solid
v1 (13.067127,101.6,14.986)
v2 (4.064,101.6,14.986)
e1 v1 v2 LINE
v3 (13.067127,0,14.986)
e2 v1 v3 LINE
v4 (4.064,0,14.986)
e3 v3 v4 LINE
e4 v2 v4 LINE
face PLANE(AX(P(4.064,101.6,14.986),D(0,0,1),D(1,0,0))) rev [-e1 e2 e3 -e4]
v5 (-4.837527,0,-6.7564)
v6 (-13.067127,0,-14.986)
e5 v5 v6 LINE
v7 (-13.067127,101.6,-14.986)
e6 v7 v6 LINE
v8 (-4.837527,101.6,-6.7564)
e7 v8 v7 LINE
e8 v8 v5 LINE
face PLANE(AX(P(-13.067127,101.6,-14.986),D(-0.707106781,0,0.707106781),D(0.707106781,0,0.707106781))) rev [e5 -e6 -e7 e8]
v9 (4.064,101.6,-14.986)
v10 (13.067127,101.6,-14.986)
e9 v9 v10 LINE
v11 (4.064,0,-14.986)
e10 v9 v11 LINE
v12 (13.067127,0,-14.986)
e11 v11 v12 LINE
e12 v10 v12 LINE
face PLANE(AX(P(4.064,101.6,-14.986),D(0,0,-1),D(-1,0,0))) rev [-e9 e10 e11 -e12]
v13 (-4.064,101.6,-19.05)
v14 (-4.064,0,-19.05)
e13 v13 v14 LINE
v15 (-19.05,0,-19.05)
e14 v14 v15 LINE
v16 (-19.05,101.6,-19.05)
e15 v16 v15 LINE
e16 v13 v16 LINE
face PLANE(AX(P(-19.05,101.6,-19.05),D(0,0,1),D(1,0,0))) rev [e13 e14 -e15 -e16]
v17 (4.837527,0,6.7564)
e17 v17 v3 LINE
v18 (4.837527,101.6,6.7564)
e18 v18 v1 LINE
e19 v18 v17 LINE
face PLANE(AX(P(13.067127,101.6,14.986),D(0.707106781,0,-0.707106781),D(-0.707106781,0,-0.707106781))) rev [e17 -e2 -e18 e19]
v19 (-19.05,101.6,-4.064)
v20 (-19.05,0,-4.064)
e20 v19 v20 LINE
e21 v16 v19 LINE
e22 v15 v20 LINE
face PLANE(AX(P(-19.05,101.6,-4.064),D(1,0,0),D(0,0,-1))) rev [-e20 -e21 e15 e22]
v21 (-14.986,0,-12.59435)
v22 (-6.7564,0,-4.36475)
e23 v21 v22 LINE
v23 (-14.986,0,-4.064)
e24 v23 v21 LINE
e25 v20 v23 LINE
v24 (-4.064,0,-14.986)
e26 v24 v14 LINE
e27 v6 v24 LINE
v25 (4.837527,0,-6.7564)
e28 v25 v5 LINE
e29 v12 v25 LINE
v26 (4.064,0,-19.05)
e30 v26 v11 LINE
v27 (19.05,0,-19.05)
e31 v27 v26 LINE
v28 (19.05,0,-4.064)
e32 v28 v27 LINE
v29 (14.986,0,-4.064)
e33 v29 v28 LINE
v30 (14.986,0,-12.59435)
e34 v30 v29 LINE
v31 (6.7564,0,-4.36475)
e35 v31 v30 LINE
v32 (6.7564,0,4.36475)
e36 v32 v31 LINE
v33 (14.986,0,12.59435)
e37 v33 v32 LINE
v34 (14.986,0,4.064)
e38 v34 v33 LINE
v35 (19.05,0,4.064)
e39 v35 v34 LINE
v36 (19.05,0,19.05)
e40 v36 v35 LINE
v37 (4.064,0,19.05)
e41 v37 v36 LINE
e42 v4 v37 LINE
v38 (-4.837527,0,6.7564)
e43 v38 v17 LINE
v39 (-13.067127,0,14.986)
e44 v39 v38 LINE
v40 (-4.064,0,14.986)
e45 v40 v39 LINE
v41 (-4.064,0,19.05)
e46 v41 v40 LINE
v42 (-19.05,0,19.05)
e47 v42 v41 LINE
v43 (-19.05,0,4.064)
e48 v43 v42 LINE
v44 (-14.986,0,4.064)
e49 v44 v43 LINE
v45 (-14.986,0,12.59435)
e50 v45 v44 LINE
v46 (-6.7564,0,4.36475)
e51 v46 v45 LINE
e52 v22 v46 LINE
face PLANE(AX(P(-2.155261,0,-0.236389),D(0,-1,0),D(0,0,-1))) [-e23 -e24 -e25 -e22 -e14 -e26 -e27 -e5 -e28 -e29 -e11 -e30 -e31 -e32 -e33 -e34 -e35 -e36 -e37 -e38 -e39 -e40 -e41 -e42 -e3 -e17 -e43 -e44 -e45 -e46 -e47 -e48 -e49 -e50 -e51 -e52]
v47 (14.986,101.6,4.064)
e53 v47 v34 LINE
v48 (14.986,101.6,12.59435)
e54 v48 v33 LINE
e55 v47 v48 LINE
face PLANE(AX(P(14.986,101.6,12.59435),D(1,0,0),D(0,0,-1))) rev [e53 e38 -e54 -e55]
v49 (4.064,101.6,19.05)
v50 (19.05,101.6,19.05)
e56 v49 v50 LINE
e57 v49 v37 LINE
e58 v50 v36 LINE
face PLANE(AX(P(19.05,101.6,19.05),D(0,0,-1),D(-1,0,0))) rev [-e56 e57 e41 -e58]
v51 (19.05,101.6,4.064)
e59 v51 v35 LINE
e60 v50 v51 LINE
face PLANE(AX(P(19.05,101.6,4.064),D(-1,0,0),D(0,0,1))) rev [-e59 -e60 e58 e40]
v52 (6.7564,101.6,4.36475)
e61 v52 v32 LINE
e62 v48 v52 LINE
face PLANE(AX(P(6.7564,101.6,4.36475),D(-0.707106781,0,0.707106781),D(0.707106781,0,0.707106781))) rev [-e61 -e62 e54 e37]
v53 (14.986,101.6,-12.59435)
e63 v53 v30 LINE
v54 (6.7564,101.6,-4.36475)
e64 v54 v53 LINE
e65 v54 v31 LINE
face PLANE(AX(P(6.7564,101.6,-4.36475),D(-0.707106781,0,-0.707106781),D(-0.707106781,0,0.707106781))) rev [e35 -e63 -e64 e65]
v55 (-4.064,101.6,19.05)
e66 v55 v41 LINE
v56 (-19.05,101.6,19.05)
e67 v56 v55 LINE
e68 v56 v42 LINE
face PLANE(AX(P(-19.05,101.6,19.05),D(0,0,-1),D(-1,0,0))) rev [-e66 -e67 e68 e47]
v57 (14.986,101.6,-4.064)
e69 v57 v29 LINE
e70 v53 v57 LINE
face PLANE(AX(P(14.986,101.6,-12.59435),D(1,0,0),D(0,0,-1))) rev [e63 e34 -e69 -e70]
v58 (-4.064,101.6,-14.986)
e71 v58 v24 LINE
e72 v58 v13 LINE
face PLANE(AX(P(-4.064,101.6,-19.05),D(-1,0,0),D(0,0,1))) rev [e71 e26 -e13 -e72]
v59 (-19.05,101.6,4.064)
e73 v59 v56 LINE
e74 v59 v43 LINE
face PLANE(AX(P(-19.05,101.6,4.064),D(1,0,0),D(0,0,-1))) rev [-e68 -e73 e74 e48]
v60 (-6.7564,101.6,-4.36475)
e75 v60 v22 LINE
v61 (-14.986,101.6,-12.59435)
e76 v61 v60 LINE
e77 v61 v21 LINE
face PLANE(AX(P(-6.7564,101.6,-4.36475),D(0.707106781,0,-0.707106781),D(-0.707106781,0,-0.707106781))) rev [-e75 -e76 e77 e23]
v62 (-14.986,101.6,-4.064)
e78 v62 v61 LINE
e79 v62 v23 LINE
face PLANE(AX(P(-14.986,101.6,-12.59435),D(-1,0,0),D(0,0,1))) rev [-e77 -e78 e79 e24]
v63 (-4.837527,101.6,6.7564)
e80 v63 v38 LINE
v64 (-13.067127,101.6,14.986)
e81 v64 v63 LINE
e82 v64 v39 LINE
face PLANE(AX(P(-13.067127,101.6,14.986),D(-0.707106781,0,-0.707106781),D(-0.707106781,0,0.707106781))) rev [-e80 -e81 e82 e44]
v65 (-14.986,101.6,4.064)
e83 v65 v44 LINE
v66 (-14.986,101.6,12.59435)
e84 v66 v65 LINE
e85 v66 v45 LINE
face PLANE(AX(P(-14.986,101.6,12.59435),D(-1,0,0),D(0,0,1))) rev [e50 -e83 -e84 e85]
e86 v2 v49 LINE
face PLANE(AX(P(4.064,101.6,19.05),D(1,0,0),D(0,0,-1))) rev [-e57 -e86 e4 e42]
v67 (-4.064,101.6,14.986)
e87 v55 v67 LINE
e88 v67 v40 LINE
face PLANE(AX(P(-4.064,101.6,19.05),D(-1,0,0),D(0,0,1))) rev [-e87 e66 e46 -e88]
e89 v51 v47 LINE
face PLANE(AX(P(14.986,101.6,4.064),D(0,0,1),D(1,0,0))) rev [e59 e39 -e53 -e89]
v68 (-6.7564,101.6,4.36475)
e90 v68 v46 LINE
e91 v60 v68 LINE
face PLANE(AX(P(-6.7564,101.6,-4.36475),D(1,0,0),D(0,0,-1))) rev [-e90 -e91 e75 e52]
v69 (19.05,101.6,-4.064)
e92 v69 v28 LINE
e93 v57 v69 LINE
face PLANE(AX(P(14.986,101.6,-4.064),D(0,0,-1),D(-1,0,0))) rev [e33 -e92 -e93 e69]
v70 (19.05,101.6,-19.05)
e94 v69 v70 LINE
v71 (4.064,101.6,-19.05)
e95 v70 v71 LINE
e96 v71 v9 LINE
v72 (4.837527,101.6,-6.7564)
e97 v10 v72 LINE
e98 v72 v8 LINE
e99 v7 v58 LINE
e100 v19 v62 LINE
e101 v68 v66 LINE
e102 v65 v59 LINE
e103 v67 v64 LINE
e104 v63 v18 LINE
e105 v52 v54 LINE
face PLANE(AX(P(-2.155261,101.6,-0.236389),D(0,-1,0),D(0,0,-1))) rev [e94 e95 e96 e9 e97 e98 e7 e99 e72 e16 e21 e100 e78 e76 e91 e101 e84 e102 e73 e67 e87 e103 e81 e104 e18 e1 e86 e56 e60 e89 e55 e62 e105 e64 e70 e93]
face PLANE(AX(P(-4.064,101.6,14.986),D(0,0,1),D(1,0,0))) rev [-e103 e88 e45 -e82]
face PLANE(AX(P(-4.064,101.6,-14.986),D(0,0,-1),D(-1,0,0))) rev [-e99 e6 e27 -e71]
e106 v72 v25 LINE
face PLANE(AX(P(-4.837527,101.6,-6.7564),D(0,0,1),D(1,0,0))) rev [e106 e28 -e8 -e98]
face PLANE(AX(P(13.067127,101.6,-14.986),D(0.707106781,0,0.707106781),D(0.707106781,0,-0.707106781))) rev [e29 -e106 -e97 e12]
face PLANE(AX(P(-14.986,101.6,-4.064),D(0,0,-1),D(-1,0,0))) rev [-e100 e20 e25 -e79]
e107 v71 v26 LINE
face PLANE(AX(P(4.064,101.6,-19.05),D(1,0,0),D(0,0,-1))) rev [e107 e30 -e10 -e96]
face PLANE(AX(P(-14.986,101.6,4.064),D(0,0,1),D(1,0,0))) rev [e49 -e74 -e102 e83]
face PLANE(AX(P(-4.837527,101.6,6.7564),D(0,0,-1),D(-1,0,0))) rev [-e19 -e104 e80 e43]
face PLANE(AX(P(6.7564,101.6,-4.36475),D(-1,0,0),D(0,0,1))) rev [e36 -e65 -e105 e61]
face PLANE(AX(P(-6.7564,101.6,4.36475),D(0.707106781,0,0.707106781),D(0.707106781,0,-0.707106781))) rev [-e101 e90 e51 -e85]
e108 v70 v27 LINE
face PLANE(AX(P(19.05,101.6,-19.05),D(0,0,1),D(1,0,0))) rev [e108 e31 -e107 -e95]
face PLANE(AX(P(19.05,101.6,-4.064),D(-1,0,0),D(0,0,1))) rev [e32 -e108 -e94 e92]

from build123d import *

# Parameters (mm, degrees)
EXTRUDE1_DEPTH = 101.6


# Read off the part's stored shape, not the designer's step: 1515<1>
with BuildPart() as part:
    # Sketch1<2> → Extrude1 (new body)
    with BuildSketch(Plane(origin=(0, 0, 0), x_dir=(1, 0, 0), z_dir=(0, 1, 0))):
        Polygon((-6.7564, 4.364749804), (-6.7564, -4.364749804), (-14.986, -12.594349804), (-14.986, -4.064), (-19.05, -4.064), (-19.05, -19.05), (-4.064, -19.05), (-4.064, -14.986), (-13.067127258, -14.986), (-4.837527258, -6.7564), (4.837527258, -6.7564), (13.067127258, -14.986), (4.064, -14.986), (4.064, -19.05), (19.05, -19.05), (19.05, -4.064), (14.986, -4.064), (14.986, -12.594349804), (6.7564, -4.364749804), (6.7564, 4.364749804), (14.986, 12.594349804), (14.986, 4.064), (19.05, 4.064), (19.05, 19.05), (4.064, 19.05), (4.064, 14.986), (13.067127258, 14.986), (4.837527258, 6.7564), (-4.837527258, 6.7564), (-13.067127258, 14.986), (-4.064, 14.986), (-4.064, 19.05), (-19.05, 19.05), (-19.05, 4.064), (-14.986, 4.064), (-14.986, 12.594349804), align=None)
    extrude(amount=EXTRUDE1_DEPTH)


solid = part.part
